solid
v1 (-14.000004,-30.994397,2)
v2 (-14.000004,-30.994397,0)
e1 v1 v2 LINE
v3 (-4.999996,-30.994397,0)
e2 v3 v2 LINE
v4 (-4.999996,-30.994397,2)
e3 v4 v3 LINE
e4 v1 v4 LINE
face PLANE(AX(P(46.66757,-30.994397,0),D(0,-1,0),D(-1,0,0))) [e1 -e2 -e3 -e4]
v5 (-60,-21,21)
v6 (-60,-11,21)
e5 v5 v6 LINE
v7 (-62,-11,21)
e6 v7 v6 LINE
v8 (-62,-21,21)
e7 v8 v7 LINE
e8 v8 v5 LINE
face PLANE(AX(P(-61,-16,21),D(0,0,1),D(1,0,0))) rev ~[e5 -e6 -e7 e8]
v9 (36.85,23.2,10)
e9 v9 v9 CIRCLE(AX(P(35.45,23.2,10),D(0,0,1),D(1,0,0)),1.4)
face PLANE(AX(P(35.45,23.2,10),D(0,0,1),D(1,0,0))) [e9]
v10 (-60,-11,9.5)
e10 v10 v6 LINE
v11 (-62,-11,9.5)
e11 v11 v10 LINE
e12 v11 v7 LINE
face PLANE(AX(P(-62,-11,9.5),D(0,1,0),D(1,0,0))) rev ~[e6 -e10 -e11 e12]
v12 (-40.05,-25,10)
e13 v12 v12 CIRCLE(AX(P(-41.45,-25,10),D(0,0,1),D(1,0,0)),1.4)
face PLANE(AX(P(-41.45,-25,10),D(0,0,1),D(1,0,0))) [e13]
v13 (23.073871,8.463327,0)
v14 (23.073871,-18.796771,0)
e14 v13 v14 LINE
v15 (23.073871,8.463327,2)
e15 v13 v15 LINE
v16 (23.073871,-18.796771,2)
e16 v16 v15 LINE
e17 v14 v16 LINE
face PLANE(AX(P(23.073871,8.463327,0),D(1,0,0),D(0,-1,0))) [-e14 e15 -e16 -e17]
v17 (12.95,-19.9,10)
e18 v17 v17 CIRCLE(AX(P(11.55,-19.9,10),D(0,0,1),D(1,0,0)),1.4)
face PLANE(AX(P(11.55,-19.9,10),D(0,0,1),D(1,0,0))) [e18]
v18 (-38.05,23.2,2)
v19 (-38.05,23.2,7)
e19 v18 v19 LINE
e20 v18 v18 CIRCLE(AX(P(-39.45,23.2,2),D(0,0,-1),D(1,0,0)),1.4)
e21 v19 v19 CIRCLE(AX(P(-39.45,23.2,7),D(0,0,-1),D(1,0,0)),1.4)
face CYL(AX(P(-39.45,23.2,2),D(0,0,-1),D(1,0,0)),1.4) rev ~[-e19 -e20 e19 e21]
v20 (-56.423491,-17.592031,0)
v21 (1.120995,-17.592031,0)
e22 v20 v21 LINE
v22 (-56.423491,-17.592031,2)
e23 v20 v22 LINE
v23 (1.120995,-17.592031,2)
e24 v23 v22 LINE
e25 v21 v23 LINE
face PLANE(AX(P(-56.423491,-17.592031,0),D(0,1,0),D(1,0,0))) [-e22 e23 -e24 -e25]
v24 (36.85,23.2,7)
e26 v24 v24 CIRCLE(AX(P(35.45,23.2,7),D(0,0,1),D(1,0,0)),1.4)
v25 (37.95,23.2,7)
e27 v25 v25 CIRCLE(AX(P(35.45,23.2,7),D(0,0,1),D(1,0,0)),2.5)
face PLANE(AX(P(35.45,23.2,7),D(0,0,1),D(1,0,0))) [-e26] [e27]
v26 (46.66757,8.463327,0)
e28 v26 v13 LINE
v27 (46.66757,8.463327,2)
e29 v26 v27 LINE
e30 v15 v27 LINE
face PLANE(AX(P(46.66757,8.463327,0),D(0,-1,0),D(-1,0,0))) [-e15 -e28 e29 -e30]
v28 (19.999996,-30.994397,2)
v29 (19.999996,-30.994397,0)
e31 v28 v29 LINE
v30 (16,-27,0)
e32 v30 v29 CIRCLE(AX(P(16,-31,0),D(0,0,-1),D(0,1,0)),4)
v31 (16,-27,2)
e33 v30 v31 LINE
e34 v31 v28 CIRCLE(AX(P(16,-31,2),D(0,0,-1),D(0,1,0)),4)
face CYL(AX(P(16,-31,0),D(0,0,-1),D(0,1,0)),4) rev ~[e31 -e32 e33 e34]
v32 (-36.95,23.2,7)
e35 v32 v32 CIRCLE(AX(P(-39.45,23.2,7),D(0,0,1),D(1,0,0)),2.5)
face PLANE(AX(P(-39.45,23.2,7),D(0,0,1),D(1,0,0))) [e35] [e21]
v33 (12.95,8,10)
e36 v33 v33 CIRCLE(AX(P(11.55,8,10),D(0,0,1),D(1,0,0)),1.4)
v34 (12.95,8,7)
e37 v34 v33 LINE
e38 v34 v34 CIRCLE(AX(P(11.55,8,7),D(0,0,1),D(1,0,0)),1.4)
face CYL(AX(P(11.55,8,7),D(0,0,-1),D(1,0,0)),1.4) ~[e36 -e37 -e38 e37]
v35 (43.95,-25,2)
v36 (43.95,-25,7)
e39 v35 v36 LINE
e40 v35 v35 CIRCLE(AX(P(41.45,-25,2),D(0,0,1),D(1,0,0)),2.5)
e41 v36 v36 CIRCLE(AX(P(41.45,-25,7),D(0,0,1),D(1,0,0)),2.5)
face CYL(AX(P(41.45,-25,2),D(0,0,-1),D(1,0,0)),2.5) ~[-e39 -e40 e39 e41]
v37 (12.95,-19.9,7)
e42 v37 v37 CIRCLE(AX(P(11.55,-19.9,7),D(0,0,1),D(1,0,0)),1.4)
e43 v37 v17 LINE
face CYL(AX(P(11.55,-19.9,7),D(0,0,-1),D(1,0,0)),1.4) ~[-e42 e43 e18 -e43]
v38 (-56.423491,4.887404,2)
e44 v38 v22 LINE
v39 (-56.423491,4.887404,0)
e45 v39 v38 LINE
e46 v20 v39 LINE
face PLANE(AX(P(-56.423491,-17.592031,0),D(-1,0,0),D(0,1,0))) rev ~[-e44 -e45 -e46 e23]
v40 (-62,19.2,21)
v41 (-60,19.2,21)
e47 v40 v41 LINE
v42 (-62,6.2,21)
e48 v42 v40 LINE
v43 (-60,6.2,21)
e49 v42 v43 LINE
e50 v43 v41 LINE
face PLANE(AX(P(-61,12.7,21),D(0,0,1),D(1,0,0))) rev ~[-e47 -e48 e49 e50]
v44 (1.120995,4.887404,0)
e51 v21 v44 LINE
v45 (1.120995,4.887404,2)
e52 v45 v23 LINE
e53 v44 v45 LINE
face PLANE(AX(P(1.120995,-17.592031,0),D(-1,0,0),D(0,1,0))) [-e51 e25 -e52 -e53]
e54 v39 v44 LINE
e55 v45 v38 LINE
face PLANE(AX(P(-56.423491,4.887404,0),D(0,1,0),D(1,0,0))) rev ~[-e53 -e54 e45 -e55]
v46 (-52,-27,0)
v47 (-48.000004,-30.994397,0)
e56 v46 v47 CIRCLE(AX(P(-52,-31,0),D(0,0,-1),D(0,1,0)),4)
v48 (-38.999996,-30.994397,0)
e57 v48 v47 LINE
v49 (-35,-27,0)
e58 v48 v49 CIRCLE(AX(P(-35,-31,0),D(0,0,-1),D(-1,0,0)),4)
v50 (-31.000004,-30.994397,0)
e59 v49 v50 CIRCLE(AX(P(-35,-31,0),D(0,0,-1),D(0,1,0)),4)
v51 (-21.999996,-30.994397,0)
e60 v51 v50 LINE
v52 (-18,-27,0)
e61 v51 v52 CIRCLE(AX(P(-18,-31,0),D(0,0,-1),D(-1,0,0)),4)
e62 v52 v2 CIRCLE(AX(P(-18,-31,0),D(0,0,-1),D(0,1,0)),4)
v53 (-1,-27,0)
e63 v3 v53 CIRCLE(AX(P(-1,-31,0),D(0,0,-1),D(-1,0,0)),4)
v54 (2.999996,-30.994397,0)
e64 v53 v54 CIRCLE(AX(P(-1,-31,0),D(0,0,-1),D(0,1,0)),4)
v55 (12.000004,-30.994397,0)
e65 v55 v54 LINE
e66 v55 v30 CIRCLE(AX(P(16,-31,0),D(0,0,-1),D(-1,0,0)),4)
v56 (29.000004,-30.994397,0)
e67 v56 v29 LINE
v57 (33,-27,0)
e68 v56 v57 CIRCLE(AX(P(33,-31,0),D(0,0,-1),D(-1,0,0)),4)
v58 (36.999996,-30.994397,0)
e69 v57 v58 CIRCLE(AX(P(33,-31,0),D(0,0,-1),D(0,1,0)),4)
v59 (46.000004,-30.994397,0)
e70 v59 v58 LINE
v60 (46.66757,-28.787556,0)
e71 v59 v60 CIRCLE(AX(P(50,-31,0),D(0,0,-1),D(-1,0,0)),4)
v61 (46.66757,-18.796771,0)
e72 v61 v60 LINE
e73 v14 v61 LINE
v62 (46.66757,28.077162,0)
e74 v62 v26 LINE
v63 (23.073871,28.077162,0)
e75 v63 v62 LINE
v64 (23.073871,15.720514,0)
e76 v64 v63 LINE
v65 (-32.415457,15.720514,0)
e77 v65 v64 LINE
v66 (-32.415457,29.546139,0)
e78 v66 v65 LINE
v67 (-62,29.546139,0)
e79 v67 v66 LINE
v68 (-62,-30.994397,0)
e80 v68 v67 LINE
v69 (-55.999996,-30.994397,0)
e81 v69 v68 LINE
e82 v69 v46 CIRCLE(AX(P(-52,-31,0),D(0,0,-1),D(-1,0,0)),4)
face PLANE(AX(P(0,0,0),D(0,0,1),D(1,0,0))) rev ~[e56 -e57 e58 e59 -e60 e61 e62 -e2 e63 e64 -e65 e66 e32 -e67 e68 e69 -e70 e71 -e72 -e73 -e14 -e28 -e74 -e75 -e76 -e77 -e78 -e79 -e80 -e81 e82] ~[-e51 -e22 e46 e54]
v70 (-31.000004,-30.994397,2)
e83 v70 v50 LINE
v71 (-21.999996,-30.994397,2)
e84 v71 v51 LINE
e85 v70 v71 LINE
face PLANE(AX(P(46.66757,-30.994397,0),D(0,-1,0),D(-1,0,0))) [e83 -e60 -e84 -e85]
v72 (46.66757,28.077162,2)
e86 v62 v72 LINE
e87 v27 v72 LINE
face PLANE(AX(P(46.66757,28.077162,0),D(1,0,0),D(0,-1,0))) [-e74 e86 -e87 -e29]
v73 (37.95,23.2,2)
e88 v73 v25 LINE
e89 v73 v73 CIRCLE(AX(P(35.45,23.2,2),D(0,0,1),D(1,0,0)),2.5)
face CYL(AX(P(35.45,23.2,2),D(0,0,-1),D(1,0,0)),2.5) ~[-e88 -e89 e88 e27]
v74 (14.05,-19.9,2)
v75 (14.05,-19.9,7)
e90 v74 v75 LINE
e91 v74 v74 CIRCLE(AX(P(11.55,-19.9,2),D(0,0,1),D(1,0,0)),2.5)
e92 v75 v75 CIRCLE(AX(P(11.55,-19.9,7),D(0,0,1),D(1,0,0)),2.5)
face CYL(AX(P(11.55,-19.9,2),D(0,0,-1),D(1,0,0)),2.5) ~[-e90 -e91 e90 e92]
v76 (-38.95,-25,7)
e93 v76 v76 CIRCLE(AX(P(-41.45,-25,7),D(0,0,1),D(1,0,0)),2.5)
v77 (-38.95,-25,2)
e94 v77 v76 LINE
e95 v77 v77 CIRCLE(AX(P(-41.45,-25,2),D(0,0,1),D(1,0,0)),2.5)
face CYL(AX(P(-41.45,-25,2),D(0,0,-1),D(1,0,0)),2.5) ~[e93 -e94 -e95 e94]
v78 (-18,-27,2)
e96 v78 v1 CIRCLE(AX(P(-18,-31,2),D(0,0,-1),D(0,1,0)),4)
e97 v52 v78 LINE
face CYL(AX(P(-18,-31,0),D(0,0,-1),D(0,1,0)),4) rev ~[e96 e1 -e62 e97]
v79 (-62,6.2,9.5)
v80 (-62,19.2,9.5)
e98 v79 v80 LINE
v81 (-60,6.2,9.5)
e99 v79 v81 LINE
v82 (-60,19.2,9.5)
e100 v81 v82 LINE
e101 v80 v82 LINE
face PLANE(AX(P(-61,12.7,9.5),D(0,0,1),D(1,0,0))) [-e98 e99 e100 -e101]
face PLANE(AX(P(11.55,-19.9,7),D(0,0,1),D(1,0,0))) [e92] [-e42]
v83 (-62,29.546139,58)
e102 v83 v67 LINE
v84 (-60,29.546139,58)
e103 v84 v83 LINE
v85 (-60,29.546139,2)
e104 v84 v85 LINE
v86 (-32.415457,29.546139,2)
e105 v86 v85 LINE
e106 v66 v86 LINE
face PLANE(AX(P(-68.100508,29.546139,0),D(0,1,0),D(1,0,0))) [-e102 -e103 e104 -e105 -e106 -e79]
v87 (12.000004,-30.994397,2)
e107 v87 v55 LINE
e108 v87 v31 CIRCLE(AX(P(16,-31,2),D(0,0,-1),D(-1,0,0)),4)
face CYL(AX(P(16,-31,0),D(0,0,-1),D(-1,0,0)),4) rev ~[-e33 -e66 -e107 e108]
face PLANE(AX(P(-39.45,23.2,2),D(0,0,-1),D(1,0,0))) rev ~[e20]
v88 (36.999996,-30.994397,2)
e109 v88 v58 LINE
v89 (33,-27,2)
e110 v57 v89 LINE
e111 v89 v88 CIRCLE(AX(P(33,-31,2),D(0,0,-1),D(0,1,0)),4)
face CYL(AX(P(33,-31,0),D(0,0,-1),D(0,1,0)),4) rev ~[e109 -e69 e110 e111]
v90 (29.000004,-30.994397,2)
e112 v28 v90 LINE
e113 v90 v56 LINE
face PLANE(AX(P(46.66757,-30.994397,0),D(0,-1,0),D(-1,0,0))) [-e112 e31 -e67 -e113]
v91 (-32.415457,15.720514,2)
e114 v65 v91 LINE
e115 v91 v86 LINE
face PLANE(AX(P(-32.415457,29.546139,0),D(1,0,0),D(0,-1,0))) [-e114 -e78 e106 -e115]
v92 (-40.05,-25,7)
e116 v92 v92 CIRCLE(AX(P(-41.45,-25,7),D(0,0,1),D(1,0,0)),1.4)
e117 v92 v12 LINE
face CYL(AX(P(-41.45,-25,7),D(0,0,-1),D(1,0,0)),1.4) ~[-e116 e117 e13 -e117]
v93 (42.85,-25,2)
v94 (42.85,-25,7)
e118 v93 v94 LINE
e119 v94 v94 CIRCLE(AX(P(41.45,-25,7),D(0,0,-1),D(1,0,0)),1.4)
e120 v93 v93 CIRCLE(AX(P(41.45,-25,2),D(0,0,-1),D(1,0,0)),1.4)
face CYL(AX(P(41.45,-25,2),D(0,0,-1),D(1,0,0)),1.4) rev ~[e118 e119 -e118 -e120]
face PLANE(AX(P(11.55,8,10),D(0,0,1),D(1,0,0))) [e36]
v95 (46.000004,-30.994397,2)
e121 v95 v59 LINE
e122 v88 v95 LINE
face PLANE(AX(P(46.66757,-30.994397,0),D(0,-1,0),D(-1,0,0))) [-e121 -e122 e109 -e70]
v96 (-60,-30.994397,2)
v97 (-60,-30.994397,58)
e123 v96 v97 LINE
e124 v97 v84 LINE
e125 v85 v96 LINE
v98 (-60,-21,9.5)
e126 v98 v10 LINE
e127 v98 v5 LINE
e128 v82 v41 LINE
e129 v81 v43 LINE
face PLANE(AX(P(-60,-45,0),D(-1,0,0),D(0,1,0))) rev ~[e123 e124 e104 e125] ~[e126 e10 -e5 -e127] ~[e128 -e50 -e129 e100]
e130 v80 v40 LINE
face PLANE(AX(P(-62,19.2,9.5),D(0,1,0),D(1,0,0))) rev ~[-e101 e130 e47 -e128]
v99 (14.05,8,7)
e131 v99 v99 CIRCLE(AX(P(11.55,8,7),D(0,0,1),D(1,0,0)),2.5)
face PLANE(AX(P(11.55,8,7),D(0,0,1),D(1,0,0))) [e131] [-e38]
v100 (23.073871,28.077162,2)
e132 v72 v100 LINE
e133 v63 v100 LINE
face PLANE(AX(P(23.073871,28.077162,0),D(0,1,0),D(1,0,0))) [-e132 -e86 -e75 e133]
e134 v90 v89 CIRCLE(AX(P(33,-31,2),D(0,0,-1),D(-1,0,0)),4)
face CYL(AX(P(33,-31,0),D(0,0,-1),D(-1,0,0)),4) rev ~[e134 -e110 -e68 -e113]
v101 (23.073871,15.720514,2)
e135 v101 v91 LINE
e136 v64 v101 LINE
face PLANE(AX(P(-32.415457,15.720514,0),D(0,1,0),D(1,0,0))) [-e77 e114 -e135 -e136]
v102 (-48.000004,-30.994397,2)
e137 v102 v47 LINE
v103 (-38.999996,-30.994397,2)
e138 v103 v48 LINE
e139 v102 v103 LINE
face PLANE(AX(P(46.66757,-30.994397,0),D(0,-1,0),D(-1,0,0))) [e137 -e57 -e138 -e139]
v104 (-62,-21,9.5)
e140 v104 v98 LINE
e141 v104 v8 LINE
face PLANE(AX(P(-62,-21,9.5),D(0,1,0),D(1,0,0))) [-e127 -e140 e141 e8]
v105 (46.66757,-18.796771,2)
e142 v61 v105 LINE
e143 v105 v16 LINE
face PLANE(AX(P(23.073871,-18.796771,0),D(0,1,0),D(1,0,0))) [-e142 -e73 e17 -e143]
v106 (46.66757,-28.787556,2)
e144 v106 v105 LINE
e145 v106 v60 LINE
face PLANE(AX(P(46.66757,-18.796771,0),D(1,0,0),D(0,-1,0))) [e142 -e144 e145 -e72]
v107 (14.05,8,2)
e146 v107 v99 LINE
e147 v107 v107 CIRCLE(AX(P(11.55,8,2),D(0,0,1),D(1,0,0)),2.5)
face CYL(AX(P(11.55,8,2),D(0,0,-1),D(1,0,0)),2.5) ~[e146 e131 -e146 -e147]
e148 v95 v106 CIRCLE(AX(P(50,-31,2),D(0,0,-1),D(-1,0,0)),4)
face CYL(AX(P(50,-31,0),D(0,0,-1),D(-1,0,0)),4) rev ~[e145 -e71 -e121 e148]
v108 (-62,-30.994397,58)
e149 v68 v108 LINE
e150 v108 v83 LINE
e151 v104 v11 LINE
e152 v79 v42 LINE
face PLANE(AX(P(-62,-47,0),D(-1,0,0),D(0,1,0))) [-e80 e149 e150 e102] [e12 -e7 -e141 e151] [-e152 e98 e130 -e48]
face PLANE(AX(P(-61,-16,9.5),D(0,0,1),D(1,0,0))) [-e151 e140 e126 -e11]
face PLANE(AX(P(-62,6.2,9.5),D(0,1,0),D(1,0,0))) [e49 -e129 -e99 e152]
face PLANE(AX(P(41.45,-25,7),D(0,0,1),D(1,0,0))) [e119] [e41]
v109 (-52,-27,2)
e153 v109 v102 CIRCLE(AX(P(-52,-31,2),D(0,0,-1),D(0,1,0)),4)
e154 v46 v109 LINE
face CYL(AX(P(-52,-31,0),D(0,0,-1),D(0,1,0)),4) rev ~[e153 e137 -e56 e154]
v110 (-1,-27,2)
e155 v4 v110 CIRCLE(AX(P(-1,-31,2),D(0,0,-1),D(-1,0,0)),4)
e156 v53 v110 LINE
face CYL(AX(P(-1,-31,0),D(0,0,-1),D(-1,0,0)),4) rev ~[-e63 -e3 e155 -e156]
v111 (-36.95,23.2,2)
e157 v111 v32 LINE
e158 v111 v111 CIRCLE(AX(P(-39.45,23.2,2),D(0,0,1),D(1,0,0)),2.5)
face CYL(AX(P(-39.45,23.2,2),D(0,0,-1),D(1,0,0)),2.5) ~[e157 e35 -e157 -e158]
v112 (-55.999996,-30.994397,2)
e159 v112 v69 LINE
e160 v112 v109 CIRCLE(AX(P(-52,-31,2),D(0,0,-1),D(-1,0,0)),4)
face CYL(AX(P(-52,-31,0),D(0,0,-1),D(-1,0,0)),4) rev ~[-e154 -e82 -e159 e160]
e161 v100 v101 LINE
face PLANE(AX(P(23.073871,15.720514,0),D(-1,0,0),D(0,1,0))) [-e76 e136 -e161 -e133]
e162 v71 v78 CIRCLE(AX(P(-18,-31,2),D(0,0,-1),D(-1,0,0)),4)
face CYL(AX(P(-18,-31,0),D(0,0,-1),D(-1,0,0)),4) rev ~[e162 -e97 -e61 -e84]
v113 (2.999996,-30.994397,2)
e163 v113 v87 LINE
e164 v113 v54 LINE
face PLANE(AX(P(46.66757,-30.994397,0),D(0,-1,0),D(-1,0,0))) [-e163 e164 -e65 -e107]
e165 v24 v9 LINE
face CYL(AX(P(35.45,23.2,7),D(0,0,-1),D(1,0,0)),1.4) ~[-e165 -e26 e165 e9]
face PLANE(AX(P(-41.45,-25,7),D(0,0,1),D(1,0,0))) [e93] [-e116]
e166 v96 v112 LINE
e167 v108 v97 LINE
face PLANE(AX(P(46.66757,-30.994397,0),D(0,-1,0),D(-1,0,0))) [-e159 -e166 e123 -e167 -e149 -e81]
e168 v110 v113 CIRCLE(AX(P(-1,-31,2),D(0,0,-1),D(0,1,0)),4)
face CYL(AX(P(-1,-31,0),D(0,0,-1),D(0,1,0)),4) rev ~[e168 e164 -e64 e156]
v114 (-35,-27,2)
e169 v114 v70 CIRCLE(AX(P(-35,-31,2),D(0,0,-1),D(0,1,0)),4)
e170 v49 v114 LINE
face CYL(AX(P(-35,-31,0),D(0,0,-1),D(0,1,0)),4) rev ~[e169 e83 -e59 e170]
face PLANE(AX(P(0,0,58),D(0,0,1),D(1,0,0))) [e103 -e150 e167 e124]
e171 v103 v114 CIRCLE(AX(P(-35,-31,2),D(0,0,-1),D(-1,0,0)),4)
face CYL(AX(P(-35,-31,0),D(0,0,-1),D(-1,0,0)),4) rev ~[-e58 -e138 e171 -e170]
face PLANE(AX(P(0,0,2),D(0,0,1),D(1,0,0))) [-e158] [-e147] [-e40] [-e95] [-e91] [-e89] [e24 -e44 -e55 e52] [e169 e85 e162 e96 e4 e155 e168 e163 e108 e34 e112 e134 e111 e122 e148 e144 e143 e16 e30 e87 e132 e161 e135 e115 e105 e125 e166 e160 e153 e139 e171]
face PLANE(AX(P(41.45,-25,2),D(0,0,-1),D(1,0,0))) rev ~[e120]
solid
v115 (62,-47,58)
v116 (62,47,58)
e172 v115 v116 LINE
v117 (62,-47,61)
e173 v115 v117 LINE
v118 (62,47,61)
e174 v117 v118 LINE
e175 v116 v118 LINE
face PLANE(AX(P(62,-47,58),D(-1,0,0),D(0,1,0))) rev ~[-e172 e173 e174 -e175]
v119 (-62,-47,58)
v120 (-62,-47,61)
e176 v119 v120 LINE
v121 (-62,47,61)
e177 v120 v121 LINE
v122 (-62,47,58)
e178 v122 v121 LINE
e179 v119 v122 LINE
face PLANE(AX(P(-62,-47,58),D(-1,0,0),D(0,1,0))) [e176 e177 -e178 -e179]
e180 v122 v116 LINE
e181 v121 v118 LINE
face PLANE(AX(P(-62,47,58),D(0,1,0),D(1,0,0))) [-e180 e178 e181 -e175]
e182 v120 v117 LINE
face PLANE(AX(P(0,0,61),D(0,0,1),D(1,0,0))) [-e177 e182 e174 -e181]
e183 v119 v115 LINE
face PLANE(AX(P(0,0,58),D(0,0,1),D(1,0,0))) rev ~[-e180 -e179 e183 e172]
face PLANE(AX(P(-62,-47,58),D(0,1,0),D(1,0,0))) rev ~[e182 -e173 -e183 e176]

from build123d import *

# Parameters (mm, degrees)
F0_W      = 124
F0_H      = 94
F1_DEPTH  = 2
F2_DEPTH  = 58
F3_R      = 2.5
F4_DEPTH  = 5
F5_R      = 1.4
F6_DEPTH  = 3
F7_D      = 2.8
F7_DEPTH  = 5
F7_TIP    = 0.8412048666
F9_DEPTH  = 8
F10_W     = 1
F10_H     = 50
F11_DEPTH = 3
F12_W     = 5
F12_H     = 3
F13_DEPTH = 1
F14_W     = 124
F14_H     = 94
F15_DEPTH = 3
F17_W     = 2
F17_H     = 13
F17_H_2   = 10
F18_DEPTH = 11.5
F19_W     = 199.5194256306
F19_H     = 143.535412848
F19_W_2   = 57.5444861315
F19_H_2   = 22.4794349963
F20_DEPTH = 100


# Not quite as in the source:
# - a feature names something its author has since deleted; it is built from what else it names


with BuildPart() as f1:
    # F0 (on Top) → F1 (new body)
    with BuildSketch(Plane.XY):
        Rectangle(F0_W, F0_H)
        Polygon((-60, -45), (-60, 45), (60, 45), (60, 31), (60, 29), (60, -45), align=None, mode=Mode.SUBTRACT)
        Polygon((60, 45), (-60, 45), (-60, -45), (60, -45), (60, 29), (60, 31), align=None)
    extrude(amount=F1_DEPTH)

    # F0 (on Top) → F2 (join)
    with BuildSketch(Plane.XY):
        Rectangle(F0_W, F0_H)
        Polygon((-60, -45), (-60, 45), (60, 45), (60, 31), (60, 29), (60, -45), align=None, mode=Mode.SUBTRACT)
    extrude(amount=F2_DEPTH)

    # F3 (on face) → F4 (join)
    with BuildSketch(Plane.XY.offset(2)):
        with Locations((35.45, 23.2)):
            Circle(F3_R)
        with Locations((11.55, -19.9)):
            Circle(F3_R)
        with Locations((41.45, -25)):
            Circle(F3_R)
        with Locations((11.55, 8)):
            Circle(F3_R)
        with Locations((-39.45, 23.2)):
            Circle(F3_R)
        with Locations((-41.45, -25)):
            Circle(F3_R)
    extrude(amount=F4_DEPTH)

    # F5 (on face) → F6 (join)
    with BuildSketch(Plane.XY.offset(7)):
        with Locations((35.45, 23.2)):
            Circle(F5_R)
        with Locations((11.55, 8)):
            Circle(F5_R)
        with Locations((11.55, -19.9)):
            Circle(F5_R)
        with Locations((-41.45, -25)):
            Circle(F5_R)
    extrude(amount=F6_DEPTH)

    # F7 (one way)
    with BuildSketch(Plane(origin=(0, 0, 2), x_dir=(1, 0, 0), z_dir=(0, 0, -1))):
        with Locations((-39.45, -23.2), (41.45, 25)):
            Circle(F7_D / 2)
    extrude(amount=-F7_DEPTH, mode=Mode.SUBTRACT)
    with Locations(Plane(origin=(0, 0, 2), x_dir=(1, 0, 0), z_dir=(0, 0, -1))):
        with Locations((-39.45, -23.2), (41.45, 25)):
            with Locations((0, 0, -(F7_DEPTH + F7_TIP / 2))):  # 118° drill point
                Cone(0, F7_D / 2, F7_TIP, mode=Mode.SUBTRACT)

    # F8 (on face) → F9 (cut)
    with BuildSketch(Plane(origin=(0, 0, 0), x_dir=(1, 0, 0), z_dir=(0, 0, -1))):
        with BuildLine():
            Line((-52, 27), (-52, 47))
            Line((-52, 47), (-56, 47))
            Line((-56, 47), (-56, 31))
            ThreePointArc((-56, 31), (-54.8284271247, 28.1715728753), (-52, 27))
        make_face()
        with BuildLine():
            Line((-48, 47), (-52, 47))
            Line((-52, 47), (-52, 27))
            ThreePointArc((-52, 27), (-49.1715728753, 28.1715728753), (-48, 31))
            Line((-48, 31), (-48, 47))
        make_face()
        with BuildLine():
            Line((-35, 47), (-39, 47))
            Line((-39, 47), (-39, 31))
            ThreePointArc((-39, 31), (-37.8284271247, 28.1715728753), (-35, 27))
            ThreePointArc((-35, 27), (-32.1715728753, 28.1715728753), (-31, 31))
            Line((-31, 31), (-31, 47))
            Line((-31, 47), (-35, 47))
        make_face()
        with BuildLine():
            Line((-18, 47), (-22, 47))
            Line((-22, 47), (-22, 31))
            ThreePointArc((-22, 31), (-20.8284271247, 28.1715728753), (-18, 27))
            ThreePointArc((-18, 27), (-15.1715728753, 28.1715728753), (-14, 31))
            Line((-14, 31), (-14, 47))
            Line((-14, 47), (-18, 47))
        make_face()
        with BuildLine():
            Line((-1, 47), (-5, 47))
            Line((-5, 47), (-5, 31))
            ThreePointArc((-5, 31), (-3.8284271247, 28.1715728753), (-1, 27))
            ThreePointArc((-1, 27), (1.8284271247, 28.1715728753), (3, 31))
            Line((3, 31), (3, 47))
            Line((3, 47), (-1, 47))
        make_face()
        with BuildLine():
            Line((16, 47), (12, 47))
            Line((12, 47), (12, 31))
            ThreePointArc((12, 31), (13.1715728753, 28.1715728753), (16, 27))
            ThreePointArc((16, 27), (18.8284271247, 28.1715728753), (20, 31))
            Line((20, 31), (20, 47))
            Line((20, 47), (16, 47))
        make_face()
        with BuildLine():
            Line((37, 31), (37, 47))
            Line((37, 47), (33, 47))
            Line((33, 47), (29, 47))
            Line((29, 47), (29, 31))
            ThreePointArc((29, 31), (30.1715728753, 28.1715728753), (33, 27))
            ThreePointArc((33, 27), (35.8284271247, 28.1715728753), (37, 31))
        make_face()
        with BuildLine():
            Line((54, 31), (54, 47))
            Line((54, 47), (50, 47))
            Line((50, 47), (46, 47))
            Line((46, 47), (46, 31))
            ThreePointArc((46, 31), (47.1715728753, 28.1715728753), (50, 27))
            ThreePointArc((50, 27), (52.8284271247, 28.1715728753), (54, 31))
        make_face()
    extrude(amount=-F9_DEPTH, mode=Mode.SUBTRACT)

    # F10 (on face) → F11 (join)
    with BuildSketch(Plane.XZ.offset(-45)):
        with Locations((-42, 27)):
            Rectangle(F10_W, F10_H)
        with Locations((-38, 27)):
            Rectangle(F10_W, F10_H)
        with Locations((2, 27)):
            Rectangle(F10_W, F10_H)
        with Locations((-2, 27)):
            Rectangle(F10_W, F10_H)
        with Locations((38, 27)):
            Rectangle(F10_W, F10_H)
        with Locations((42, 27)):
            Rectangle(F10_W, F10_H)
    extrude(amount=F11_DEPTH)

    # F12 (on face) → F13 (join)
    with BuildSketch(Plane.XZ.offset(-42)):
        with Locations((0, 50.5)):
            Rectangle(F12_W, F12_H)
        with Locations((0, 42.5)):
            Rectangle(F12_W, F12_H)
        with Locations((0, 35.5)):
            Rectangle(F12_W, F12_H)
        with Locations((0, 27.5)):
            Rectangle(F12_W, F12_H)
        with Locations((0, 19.5)):
            Rectangle(F12_W, F12_H)
        with Locations((0, 11.5)):
            Rectangle(F12_W, F12_H)
        with Locations((40, 19.5)):
            Rectangle(F12_W, F12_H)
        with Locations((40, 42.5)):
            Rectangle(F12_W, F12_H)
        with Locations((40, 50.5)):
            Rectangle(F12_W, F12_H)
        with Locations((40, 35.5)):
            Rectangle(F12_W, F12_H)
        with Locations((40, 27.5)):
            Rectangle(F12_W, F12_H)
        with Locations((40, 11.5)):
            Rectangle(F12_W, F12_H)
        with Locations((-40, 19.5)):
            Rectangle(F12_W, F12_H)
        with Locations((-40, 50.5)):
            Rectangle(F12_W, F12_H)
        with Locations((-40, 27.5)):
            Rectangle(F12_W, F12_H)
        with Locations((-40, 35.5)):
            Rectangle(F12_W, F12_H)
        with Locations((-40, 11.5)):
            Rectangle(F12_W, F12_H)
        with Locations((-40, 42.5)):
            Rectangle(F12_W, F12_H)
    extrude(amount=-F13_DEPTH)

    # F17 (on offset) → F18 (cut)
    with BuildSketch(Plane.XY.offset(9.5)):
        with Locations((-61, 12.7)):
            Rectangle(F17_W, F17_H)
        with Locations((-61, -16)):
            Rectangle(F17_W, F17_H_2)
    extrude(amount=F18_DEPTH, mode=Mode.SUBTRACT)

    # F19 (on Top) → F20 (cut)
    with BuildSketch(Plane.XY):
        with Locations((2.5972127914, -1.2879259884)):
            Rectangle(F19_W, F19_H)
        Polygon((-68.1005078713, -30.994397391), (-68.1005078713, 29.5461390275), (-32.4154566388, 29.5461390275), (-32.4154566388, 15.7205138463), (23.0738711198, 15.7205138463), (23.0738711198, 28.0771622352), (46.6675695452, 28.0771622352), (46.6675695452, 8.4633265807), (23.0738711198, 8.4633265807), (23.0738711198, -18.7967714509), (46.6675695452, -18.7967714509), (46.6675695452, -30.994397391), align=None, mode=Mode.SUBTRACT)
        with Locations((-27.6512478013, -6.3523130957)):
            Rectangle(F19_W_2, F19_H_2)
    extrude(amount=F20_DEPTH, mode=Mode.SUBTRACT)


with BuildPart() as f15:
    # F14 (on face) → F15 (new body)
    with BuildSketch(Plane.XY.offset(58)):
        Rectangle(F14_W, F14_H)
    extrude(amount=F15_DEPTH)


solid = Compound([f1.part, f15.part])
